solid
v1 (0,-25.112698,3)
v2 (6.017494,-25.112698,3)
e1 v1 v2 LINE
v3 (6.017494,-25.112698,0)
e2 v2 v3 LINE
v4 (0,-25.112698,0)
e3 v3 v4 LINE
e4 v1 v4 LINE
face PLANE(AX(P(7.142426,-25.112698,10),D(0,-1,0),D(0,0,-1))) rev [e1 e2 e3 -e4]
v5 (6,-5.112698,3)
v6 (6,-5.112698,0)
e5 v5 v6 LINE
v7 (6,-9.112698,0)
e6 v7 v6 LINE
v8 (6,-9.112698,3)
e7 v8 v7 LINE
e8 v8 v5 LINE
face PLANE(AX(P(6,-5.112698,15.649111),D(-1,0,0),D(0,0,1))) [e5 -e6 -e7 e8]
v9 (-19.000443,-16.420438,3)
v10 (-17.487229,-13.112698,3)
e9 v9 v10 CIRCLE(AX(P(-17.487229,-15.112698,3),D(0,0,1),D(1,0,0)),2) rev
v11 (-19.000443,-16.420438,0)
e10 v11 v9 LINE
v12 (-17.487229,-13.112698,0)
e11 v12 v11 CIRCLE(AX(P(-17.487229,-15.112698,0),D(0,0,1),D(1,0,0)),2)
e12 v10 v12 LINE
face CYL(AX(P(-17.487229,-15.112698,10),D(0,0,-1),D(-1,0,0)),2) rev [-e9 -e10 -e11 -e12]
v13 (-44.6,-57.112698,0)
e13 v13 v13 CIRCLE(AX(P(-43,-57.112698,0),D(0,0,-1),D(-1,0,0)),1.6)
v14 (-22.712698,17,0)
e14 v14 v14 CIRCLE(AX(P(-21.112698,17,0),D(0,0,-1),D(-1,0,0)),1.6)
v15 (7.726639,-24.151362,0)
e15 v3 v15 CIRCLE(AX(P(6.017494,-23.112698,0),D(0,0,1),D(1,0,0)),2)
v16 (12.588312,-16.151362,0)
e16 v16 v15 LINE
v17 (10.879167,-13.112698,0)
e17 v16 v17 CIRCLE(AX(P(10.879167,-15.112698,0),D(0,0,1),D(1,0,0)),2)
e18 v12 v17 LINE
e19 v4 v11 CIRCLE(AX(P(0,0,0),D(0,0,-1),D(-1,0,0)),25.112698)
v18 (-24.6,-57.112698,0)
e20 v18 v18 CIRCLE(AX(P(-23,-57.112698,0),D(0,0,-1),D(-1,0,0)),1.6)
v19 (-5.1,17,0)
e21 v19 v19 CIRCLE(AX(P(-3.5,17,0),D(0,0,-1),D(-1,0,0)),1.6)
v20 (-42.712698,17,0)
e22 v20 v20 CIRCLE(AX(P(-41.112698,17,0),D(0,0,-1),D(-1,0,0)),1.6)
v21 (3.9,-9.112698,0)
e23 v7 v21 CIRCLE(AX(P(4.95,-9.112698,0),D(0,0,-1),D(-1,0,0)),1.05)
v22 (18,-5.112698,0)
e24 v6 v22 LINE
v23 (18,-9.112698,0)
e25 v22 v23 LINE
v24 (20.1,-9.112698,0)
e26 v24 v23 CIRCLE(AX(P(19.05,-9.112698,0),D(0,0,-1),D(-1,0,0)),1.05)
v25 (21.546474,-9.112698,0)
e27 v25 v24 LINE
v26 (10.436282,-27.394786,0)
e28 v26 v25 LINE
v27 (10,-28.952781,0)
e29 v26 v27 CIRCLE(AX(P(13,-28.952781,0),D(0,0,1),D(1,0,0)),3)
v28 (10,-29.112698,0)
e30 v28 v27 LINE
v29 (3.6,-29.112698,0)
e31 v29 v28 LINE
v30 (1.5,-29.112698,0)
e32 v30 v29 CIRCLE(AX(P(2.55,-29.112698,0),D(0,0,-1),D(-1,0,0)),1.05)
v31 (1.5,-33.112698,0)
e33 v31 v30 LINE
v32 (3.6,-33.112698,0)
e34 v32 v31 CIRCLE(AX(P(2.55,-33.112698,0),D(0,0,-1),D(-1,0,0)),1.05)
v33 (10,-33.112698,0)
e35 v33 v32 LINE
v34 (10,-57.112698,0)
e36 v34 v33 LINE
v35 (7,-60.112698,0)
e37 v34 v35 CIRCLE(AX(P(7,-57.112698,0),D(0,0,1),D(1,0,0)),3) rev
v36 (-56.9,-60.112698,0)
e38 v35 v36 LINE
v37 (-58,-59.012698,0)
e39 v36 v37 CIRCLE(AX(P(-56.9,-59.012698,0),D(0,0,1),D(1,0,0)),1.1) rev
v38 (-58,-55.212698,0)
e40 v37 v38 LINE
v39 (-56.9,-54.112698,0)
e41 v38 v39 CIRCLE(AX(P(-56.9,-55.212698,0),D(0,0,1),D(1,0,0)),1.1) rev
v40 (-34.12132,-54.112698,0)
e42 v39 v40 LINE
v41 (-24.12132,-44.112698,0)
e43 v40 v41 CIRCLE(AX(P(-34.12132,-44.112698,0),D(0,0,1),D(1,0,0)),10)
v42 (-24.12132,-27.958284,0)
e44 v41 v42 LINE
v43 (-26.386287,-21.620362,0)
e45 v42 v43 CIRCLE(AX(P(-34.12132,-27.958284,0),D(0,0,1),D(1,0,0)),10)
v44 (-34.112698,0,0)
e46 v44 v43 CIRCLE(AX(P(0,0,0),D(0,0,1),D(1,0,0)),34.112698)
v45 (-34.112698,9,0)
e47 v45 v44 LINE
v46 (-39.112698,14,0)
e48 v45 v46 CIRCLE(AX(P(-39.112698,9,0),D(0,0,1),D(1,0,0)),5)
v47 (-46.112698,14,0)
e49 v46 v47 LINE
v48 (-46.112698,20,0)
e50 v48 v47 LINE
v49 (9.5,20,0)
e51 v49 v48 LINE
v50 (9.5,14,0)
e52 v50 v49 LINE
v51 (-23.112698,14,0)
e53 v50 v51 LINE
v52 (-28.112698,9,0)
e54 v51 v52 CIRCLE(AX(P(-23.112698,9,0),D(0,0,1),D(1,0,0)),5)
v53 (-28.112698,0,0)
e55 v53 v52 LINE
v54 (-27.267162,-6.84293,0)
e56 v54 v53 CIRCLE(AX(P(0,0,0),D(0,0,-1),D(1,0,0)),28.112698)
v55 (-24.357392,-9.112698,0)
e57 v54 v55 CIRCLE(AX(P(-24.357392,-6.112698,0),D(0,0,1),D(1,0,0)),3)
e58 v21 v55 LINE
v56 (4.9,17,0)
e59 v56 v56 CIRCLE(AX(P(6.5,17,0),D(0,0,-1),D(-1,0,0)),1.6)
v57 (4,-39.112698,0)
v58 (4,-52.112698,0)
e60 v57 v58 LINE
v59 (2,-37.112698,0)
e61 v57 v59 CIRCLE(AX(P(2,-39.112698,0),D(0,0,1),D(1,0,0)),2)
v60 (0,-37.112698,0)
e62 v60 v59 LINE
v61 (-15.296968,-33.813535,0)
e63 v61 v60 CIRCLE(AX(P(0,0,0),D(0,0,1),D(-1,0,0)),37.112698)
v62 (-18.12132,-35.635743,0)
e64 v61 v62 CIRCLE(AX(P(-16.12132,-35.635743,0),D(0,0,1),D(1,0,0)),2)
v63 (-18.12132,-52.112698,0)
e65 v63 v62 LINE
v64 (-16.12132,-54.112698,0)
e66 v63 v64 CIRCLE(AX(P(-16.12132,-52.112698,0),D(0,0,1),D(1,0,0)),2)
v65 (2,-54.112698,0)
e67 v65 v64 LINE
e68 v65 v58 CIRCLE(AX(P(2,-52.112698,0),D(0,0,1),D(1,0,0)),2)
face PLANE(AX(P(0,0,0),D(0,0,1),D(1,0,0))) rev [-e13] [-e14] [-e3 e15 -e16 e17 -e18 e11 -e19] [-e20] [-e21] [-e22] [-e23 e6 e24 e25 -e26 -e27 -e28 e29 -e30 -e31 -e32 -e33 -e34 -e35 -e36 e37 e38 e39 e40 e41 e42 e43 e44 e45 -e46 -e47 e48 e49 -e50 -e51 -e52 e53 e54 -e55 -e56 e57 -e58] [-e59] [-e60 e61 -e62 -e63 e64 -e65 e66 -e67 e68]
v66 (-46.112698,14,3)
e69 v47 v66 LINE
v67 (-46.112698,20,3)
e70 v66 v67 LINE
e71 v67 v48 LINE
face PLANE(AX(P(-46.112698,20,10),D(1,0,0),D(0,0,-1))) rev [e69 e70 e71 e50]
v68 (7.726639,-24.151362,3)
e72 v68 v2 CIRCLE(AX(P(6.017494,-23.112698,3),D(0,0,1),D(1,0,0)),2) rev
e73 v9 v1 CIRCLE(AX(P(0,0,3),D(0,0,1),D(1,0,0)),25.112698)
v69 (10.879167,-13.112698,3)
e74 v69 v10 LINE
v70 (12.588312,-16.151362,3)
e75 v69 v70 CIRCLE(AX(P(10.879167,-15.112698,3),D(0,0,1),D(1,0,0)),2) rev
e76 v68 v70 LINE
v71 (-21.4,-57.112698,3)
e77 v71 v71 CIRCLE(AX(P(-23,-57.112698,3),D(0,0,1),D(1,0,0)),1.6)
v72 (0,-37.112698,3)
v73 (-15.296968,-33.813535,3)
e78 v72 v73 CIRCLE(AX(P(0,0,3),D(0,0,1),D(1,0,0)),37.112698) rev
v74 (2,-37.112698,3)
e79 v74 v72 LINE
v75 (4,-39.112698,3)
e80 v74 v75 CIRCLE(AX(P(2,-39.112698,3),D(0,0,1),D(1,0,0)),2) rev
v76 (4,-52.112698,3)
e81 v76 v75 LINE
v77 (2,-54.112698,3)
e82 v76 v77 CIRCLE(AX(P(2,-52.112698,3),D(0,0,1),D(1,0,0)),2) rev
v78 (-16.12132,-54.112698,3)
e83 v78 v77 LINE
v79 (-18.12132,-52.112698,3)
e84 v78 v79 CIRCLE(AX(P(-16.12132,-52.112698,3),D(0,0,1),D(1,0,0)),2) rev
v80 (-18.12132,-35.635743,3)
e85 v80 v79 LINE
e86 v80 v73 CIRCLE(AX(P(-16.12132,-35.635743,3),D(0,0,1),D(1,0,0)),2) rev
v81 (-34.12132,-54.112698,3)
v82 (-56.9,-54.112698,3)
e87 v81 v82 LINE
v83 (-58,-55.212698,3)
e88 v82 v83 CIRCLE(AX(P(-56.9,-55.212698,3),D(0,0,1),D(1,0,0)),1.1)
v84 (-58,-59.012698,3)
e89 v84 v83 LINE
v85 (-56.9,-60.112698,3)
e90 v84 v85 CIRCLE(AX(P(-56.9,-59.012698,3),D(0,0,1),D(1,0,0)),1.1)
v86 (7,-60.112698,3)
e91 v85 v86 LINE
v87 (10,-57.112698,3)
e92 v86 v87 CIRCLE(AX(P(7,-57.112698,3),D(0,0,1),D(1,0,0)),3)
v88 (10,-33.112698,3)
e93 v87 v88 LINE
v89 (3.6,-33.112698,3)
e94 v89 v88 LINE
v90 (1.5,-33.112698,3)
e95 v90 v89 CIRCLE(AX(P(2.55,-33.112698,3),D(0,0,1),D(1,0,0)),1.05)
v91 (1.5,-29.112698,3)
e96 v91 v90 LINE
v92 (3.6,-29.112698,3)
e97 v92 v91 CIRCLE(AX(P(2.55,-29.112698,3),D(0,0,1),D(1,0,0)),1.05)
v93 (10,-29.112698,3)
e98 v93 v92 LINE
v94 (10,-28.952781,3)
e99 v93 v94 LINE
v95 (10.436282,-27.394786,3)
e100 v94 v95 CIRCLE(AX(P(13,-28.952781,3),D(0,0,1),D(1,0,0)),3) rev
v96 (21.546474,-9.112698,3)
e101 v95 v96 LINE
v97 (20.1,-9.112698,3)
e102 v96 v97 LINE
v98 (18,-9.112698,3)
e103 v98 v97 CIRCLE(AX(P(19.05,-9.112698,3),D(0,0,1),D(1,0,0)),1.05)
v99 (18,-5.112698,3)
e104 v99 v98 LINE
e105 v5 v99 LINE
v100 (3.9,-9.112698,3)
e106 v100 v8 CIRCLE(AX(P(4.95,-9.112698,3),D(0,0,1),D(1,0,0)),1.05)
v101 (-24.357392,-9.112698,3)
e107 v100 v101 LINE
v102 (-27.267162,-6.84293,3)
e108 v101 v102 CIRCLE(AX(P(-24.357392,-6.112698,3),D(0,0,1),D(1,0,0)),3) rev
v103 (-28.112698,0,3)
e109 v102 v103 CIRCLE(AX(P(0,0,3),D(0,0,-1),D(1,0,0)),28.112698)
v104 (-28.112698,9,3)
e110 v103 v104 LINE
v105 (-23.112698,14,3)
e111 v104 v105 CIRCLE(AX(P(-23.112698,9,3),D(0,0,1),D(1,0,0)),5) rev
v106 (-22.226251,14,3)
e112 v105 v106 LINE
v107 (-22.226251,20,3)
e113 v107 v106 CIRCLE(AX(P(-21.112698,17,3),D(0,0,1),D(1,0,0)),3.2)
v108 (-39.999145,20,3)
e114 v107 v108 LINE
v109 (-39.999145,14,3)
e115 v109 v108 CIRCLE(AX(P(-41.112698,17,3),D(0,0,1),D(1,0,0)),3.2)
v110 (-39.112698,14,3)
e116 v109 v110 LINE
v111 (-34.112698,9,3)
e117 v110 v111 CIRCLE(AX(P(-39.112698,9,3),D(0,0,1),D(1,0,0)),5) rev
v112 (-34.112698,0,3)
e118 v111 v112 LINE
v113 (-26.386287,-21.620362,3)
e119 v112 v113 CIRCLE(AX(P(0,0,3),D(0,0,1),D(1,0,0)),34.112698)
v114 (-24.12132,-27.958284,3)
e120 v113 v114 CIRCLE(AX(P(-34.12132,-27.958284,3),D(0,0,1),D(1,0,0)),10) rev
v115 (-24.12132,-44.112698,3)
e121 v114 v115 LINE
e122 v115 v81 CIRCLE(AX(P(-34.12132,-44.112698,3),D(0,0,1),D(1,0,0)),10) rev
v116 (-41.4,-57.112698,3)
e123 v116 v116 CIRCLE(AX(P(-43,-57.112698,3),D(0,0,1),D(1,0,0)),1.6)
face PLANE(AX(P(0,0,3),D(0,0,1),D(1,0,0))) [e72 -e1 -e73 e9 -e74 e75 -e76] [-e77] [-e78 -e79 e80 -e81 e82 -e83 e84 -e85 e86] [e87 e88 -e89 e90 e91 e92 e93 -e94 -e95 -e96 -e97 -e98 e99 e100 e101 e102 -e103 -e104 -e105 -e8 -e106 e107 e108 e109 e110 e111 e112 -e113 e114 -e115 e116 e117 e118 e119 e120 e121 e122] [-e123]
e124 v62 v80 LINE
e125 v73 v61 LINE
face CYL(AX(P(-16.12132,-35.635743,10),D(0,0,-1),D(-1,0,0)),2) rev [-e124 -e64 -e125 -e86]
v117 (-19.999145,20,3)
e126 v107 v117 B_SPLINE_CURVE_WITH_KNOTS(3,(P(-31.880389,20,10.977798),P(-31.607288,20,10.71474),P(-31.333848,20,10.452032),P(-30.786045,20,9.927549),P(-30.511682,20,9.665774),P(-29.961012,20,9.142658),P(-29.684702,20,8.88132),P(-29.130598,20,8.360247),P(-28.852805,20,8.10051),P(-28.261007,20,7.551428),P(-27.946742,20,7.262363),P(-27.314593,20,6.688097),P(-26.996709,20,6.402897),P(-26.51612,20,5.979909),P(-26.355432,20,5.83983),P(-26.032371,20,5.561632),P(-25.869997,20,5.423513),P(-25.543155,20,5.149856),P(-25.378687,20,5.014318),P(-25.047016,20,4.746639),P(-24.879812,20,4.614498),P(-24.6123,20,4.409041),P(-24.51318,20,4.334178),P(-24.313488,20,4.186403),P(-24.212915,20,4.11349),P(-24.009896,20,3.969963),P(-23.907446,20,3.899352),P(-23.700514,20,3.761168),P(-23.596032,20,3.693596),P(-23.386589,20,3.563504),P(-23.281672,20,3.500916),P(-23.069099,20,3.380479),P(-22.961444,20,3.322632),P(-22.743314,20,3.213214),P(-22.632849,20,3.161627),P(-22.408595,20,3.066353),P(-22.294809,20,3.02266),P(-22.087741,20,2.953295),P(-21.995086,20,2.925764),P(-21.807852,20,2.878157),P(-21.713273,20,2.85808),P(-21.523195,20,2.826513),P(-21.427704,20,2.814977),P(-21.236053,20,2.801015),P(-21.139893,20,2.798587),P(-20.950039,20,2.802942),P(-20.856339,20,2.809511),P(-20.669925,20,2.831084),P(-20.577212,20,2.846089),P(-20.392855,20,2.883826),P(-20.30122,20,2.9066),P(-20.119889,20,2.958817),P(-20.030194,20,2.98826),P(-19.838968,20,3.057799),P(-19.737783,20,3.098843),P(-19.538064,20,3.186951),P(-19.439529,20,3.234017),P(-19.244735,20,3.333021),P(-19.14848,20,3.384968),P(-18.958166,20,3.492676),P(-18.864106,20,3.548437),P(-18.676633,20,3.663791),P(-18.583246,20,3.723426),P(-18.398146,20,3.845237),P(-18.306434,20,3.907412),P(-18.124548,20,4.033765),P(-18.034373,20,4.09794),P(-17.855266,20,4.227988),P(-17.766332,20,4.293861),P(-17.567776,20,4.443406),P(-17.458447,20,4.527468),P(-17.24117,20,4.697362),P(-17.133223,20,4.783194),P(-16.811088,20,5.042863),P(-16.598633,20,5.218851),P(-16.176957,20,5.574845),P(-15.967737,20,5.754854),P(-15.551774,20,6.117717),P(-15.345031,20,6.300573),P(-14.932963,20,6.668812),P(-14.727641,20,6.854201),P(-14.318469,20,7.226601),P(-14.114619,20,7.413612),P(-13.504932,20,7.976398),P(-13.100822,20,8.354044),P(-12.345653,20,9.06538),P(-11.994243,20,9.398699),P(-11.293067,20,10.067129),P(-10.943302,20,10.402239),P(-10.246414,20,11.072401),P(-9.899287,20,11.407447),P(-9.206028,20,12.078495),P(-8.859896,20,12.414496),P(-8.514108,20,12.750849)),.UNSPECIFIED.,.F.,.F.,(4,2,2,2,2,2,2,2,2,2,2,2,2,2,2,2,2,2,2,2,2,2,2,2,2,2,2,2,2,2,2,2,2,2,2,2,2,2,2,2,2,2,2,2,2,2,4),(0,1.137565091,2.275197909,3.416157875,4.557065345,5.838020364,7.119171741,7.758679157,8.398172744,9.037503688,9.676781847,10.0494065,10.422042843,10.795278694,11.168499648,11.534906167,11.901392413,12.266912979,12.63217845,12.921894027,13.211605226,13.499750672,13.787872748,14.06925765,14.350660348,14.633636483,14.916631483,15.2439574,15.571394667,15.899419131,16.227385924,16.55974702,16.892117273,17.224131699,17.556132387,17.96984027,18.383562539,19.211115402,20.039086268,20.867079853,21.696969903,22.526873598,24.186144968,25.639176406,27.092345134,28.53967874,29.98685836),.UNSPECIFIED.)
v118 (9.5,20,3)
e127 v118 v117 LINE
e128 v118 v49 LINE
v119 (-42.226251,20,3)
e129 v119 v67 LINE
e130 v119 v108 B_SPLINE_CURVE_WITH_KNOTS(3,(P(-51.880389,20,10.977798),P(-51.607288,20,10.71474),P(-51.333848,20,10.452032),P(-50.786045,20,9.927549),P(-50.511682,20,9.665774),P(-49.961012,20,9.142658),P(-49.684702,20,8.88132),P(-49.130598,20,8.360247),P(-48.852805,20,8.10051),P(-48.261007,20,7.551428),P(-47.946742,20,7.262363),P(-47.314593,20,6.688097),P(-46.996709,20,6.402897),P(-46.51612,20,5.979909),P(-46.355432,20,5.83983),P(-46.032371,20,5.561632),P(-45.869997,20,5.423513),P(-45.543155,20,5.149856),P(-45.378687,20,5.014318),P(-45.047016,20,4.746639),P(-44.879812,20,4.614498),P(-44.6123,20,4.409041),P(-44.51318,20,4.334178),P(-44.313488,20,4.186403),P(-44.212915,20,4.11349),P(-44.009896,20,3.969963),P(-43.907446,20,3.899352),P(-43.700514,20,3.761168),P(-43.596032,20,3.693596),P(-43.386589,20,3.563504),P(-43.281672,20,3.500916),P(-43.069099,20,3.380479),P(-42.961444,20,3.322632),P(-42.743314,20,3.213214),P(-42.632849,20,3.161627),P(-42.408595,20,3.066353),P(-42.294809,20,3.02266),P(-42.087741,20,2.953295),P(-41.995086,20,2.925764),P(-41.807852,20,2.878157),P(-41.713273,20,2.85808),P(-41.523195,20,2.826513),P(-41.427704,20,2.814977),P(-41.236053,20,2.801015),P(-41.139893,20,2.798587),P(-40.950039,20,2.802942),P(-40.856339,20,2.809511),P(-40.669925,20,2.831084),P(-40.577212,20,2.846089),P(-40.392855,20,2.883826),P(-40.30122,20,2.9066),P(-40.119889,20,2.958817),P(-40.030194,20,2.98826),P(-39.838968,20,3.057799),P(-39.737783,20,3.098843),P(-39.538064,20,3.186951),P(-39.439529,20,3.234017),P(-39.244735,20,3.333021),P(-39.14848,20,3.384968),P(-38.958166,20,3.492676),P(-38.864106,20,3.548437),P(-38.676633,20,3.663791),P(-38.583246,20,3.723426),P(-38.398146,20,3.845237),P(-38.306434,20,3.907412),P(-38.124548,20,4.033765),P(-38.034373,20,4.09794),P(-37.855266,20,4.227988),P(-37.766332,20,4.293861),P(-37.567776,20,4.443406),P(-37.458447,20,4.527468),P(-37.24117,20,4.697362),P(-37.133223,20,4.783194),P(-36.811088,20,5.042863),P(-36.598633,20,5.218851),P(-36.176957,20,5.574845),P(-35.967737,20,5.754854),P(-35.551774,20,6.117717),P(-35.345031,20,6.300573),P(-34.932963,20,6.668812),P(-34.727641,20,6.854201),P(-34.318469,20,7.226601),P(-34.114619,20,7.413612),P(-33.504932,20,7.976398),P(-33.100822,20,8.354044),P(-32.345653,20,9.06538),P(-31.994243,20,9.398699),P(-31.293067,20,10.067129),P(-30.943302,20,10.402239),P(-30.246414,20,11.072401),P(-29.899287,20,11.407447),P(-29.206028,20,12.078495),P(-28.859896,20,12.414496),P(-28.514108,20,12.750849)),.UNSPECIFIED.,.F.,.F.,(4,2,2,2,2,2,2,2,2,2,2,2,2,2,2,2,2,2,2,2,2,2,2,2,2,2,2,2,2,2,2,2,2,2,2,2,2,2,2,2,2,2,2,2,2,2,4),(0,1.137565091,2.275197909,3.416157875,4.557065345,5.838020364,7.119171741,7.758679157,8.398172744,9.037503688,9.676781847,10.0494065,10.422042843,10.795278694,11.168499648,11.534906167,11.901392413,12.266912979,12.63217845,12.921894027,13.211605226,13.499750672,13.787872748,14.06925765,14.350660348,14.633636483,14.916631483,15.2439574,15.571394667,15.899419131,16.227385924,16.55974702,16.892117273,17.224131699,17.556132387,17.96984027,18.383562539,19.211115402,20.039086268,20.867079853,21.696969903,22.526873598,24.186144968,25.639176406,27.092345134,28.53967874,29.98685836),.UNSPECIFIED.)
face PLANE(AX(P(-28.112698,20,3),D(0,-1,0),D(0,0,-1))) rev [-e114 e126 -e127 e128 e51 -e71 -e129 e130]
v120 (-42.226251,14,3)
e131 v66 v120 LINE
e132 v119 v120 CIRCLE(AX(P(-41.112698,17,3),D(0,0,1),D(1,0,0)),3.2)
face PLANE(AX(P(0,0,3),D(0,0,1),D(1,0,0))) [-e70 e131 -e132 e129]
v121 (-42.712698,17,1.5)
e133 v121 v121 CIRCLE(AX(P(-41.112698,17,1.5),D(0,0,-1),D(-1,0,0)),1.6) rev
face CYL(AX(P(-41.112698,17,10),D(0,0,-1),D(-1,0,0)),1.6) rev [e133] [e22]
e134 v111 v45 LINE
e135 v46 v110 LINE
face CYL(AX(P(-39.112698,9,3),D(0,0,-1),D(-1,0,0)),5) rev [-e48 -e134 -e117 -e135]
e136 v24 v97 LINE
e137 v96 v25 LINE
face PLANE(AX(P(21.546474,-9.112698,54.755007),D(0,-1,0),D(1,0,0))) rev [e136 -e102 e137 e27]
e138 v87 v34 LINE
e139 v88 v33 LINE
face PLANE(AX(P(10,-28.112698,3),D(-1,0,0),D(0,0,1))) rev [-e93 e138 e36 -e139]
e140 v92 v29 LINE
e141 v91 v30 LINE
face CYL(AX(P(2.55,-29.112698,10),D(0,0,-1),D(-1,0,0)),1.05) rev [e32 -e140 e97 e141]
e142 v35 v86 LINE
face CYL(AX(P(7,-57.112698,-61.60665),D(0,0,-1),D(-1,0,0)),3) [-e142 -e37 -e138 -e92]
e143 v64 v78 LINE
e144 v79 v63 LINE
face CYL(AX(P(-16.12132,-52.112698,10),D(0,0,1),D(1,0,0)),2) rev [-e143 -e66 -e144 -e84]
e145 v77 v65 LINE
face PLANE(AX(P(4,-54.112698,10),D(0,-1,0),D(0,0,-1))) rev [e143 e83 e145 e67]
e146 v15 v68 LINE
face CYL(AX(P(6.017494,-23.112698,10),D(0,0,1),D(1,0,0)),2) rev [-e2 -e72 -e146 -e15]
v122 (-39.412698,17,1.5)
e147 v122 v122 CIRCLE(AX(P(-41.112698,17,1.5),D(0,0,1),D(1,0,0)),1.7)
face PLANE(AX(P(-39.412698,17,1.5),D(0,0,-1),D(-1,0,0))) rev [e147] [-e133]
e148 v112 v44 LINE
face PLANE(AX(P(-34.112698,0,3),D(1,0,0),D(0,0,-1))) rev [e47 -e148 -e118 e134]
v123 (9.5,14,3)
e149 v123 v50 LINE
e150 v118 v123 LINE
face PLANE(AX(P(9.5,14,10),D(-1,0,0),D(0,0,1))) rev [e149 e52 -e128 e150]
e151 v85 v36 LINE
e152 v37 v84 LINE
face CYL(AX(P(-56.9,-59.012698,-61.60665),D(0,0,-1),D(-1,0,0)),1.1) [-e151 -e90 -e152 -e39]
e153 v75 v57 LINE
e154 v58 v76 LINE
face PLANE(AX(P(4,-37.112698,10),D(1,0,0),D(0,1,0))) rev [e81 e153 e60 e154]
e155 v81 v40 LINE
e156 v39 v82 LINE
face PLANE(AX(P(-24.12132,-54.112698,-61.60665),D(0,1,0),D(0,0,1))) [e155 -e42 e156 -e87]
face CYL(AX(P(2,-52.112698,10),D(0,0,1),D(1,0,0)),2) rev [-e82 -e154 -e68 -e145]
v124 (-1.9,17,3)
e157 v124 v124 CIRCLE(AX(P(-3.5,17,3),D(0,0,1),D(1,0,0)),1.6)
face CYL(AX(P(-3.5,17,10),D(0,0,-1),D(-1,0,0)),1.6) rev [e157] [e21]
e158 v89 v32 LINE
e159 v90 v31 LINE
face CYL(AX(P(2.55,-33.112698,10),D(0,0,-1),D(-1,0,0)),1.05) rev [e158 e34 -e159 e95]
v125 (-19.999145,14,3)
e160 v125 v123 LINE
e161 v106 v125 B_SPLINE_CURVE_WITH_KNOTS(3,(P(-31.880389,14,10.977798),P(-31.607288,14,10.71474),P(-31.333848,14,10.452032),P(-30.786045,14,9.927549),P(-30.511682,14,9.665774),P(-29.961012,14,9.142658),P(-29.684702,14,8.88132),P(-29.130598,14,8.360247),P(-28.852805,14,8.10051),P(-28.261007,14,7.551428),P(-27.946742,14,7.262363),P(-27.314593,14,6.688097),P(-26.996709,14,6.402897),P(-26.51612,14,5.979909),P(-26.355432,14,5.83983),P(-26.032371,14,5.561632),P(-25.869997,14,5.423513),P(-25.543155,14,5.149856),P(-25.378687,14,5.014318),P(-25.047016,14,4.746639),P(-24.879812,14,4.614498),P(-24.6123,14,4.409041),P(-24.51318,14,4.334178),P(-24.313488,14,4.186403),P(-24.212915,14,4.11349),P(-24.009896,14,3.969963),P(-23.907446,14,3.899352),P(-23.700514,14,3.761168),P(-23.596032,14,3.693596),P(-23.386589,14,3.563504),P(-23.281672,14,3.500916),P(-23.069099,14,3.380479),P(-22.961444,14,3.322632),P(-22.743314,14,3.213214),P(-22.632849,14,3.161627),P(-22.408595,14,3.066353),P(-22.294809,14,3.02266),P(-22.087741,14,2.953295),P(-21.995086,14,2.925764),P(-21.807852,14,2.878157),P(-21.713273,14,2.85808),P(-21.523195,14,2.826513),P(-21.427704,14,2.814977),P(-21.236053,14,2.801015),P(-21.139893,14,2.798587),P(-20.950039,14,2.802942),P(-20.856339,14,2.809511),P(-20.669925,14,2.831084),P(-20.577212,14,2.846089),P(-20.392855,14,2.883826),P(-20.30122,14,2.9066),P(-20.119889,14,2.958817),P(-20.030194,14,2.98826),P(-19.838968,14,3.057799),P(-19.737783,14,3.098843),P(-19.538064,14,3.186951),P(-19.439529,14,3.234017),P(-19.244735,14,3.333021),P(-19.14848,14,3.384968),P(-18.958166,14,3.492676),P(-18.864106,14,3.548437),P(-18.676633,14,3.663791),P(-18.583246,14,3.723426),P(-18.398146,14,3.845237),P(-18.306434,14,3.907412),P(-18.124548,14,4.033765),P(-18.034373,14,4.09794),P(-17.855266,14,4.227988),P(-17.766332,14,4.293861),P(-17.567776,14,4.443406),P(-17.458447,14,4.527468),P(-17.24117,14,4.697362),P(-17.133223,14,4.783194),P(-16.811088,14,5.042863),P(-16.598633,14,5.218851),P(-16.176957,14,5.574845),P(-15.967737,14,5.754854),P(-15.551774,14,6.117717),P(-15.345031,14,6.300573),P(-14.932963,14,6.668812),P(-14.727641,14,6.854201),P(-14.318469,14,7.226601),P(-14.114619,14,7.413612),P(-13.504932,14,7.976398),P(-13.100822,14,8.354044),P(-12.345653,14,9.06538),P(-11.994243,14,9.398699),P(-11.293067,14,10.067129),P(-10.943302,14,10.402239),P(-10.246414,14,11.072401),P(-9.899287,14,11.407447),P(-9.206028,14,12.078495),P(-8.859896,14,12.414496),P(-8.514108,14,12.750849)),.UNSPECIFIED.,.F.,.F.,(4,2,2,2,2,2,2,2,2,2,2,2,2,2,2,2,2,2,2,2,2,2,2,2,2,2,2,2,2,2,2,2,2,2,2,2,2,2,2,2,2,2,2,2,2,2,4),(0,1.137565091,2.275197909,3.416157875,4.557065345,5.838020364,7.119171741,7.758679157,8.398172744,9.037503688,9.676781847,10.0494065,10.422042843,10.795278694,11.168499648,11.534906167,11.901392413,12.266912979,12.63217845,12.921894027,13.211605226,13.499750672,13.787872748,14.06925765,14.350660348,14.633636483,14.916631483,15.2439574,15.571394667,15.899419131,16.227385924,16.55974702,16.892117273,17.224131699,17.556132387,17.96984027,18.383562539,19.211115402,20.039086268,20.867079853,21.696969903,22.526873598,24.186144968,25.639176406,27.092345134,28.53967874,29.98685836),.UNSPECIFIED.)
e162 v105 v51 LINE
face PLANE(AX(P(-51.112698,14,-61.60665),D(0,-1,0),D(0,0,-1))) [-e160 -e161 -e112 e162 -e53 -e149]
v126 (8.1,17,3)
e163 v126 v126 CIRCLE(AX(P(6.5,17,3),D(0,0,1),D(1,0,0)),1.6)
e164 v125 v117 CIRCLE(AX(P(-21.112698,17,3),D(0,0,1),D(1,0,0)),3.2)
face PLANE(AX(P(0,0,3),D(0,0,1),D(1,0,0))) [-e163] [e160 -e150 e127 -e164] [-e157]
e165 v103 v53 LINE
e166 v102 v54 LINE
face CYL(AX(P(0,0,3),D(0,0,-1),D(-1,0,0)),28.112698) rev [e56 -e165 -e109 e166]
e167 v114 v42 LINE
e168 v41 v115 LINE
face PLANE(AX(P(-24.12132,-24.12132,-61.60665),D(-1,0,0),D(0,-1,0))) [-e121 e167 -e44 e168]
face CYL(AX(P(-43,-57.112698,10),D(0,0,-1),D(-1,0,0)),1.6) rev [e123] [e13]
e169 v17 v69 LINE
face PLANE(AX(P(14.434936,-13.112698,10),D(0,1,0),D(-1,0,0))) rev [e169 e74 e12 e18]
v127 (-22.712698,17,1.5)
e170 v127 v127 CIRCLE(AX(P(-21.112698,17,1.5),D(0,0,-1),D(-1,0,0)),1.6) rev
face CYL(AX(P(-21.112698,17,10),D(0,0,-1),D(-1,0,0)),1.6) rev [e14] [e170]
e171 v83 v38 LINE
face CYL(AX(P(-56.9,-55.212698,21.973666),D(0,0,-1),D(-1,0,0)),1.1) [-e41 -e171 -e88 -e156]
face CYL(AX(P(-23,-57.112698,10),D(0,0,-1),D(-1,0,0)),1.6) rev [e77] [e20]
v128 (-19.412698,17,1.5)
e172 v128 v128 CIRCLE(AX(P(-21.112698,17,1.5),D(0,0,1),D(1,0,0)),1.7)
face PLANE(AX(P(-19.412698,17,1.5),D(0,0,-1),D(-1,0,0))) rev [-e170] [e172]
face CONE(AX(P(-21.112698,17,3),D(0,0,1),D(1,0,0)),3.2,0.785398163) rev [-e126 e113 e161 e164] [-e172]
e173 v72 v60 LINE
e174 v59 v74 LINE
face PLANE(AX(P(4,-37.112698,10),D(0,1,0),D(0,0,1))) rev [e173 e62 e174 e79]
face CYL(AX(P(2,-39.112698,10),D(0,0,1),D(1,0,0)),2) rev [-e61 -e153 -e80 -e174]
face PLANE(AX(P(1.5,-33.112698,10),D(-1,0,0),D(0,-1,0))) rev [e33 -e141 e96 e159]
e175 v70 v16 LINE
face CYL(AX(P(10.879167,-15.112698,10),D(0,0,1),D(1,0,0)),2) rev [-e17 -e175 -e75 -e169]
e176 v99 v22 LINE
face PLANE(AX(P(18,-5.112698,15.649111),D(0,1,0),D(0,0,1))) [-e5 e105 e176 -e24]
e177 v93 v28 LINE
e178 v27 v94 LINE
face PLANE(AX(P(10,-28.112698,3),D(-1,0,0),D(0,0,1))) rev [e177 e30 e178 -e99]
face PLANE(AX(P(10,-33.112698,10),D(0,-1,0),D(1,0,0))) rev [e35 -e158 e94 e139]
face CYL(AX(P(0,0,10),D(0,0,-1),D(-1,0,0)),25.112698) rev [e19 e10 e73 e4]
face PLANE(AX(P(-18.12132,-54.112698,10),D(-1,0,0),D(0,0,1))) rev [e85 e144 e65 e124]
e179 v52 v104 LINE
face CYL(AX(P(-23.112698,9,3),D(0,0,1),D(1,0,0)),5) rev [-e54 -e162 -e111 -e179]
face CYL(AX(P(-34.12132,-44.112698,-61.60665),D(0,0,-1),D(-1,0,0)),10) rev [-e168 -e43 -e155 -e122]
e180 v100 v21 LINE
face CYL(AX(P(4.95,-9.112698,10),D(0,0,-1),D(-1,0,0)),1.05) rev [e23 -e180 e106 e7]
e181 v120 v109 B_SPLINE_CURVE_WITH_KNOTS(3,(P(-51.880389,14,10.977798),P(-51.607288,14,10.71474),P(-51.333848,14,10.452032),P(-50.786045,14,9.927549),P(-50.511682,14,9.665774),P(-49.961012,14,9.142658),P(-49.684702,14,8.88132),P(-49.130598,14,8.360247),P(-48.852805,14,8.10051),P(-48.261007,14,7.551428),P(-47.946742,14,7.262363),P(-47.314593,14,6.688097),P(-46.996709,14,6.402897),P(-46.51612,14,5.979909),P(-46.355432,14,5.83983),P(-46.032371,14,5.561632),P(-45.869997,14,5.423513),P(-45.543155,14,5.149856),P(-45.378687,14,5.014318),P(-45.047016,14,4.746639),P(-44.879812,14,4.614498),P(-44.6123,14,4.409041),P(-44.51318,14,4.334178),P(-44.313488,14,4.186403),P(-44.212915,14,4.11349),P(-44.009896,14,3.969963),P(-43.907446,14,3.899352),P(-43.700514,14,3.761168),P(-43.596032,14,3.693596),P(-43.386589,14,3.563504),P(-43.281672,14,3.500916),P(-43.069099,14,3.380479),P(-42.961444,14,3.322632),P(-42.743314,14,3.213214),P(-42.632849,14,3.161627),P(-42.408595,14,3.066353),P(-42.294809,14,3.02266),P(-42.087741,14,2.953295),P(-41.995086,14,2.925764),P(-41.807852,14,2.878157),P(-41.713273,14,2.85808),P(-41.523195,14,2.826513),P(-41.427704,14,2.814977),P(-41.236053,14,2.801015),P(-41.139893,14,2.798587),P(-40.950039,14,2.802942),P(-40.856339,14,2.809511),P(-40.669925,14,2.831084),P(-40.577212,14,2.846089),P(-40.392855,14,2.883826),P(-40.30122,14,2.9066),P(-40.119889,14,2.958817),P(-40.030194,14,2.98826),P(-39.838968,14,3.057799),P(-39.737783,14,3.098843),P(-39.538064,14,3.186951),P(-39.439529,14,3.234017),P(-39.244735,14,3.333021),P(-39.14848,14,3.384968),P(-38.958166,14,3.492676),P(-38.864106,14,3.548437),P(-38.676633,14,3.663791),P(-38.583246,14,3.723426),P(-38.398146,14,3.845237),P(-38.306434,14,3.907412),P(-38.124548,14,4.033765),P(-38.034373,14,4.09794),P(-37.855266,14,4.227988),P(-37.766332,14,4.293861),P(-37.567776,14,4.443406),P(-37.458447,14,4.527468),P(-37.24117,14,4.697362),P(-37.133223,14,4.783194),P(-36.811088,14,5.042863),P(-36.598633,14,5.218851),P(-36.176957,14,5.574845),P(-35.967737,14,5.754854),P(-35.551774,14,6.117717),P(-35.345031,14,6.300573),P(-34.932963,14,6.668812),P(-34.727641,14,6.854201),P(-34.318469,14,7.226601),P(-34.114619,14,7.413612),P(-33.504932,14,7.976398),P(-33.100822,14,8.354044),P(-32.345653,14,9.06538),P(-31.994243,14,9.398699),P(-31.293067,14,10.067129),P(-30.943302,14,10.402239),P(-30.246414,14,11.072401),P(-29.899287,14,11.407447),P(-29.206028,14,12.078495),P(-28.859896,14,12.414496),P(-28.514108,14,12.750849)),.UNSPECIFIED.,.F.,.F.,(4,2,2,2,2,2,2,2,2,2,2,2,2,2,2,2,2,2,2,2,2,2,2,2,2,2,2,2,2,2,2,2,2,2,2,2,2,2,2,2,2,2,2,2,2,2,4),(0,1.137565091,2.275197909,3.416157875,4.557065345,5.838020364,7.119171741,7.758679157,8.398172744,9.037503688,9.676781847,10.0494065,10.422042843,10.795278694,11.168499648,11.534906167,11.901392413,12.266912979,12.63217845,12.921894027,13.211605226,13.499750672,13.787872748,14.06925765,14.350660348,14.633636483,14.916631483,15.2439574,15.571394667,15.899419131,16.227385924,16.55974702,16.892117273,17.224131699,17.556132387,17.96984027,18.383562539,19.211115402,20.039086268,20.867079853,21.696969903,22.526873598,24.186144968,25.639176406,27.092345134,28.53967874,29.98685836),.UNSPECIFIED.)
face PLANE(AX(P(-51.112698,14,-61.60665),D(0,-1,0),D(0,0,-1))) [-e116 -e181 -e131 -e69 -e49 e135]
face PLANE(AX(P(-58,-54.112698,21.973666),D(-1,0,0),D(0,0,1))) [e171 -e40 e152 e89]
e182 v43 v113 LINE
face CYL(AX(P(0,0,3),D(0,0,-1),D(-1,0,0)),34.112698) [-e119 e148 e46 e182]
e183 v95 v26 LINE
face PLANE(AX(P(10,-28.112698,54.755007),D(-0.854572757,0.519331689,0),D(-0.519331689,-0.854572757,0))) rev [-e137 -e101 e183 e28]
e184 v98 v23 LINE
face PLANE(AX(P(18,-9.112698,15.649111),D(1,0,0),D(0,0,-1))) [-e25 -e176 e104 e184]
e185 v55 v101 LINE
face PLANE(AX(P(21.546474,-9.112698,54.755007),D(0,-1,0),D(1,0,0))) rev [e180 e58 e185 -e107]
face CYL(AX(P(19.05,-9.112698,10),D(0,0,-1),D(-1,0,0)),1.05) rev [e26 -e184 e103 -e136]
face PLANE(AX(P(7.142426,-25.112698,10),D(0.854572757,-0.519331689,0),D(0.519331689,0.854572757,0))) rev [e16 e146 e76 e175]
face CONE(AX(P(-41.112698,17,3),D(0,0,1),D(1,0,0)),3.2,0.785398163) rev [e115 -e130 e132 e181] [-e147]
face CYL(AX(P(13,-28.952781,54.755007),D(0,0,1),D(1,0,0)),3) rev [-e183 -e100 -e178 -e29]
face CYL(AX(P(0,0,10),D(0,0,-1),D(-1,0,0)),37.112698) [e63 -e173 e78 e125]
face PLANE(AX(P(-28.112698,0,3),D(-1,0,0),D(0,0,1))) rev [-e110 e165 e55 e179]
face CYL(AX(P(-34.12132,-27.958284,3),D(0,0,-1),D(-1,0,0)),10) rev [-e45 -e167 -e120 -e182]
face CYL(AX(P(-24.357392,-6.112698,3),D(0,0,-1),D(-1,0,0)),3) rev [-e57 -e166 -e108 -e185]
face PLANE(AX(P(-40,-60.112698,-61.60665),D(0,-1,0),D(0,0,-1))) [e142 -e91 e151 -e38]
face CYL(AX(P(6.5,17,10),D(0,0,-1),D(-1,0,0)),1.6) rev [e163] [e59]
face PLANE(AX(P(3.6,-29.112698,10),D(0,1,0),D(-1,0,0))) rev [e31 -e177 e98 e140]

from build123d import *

# Parameters (mm, degrees)
EXTRUDE_1_DEPTH       = 3
EXTRUDE_START         = -3
SKETCH_2_W            = 40
SKETCH_2_H            = 6
EXTRUDE_2_DEPTH       = 3
EXTRUDE_3_DEPTH       = 3
EXTRUDE_4_DEPTH       = 3
CUT_EXTRUDE_1_DEPTH   = 10
SKETCH_7_W            = 12
SKETCH_7_H            = 4
EXTRUDE_5_DEPTH       = 3
SKETCH_8_R            = 1.05
CUT_EXTRUDE_2_DEPTH   = 10
SKETCH_9_W            = 26
SKETCH_9_H            = 6
EXTRUDE_6_DEPTH       = 3
SKETCH_10_R           = 1.6
CUT_EXTRUDE_3_DEPTH   = 10
SKETCH_14_W           = 18
SKETCH_14_H           = 6
EXTRUDE_7_DEPTH       = 3
SKETCH_15_R           = 1.6
CUT_EXTRUDE_4_DEPTH   = 10
FILLET_2_R            = 3
FILLET_3_R            = 3
FILLET_4_R            = 3
FILLET_5_R            = 10
FILLET_6_R            = 1.1
CUT_EXTRUDE_7_DEPTH   = 10
FILLET_8_R            = 2
SKETCH_17_W           = 5.387301628
SKETCH_17_H           = 6
CUT_EXTRUDE_8_DEPTH   = 10
SKETCH_18_W           = 31
SKETCH_18_H           = 6
EXTRUDE_8_DEPTH       = 3
SKETCH_19_R           = 1.6
CUT_EXTRUDE_9_DEPTH   = 10
OTHER_1_OUTLINE_R     = 1.7
OTHER_1_OUTLINE_R_2   = 1.6
OTHER_1_DEPTH         = 1.5
OTHER_1_DRAFT         = -45
OTHER_1_2_OUTLINE_R   = 1.7
OTHER_1_2_OUTLINE_R_2 = 1.6
OTHER_1_2_DEPTH       = 1.5
OTHER_1_2_DRAFT       = -45
SKETCH_23_W           = 5
SKETCH_23_H           = 6
CUT_EXTRUDE_10_DEPTH  = 10
FILLET_9_R            = 5


# Read off the part's stored shape, not the designer's step: 高级异型孔1
with BuildPart() as part:
    # 草图1 → 凸台-拉伸1 (new body)
    with BuildSketch(Plane.XY):
        with BuildLine():
            Line((0, -28.112698372), (10, -28.112698372))
            Line((10, -28.112698372), (10, -34.112698372))
            Line((10, -34.112698372), (0, -34.112698372))
            ThreePointArc((0, -34.112698372), (-24.121320344, -24.121320344), (-34.112698372, 0))
            Line((-34.112698372, 0), (-34.112698372, 20))
            Line((-34.112698372, 20), (-28.112698372, 20))
            Line((-28.112698372, 20), (-28.112698372, 0))
            ThreePointArc((-28.112698372, 0), (-19.878679656, -19.878679656), (0, -28.112698372))
        make_face()
    extrude(amount=EXTRUDE_1_DEPTH)

    # 草图2 → 凸台-拉伸2 (add)
    with BuildSketch(Plane.XY.offset(3).offset(EXTRUDE_START)):
        with BuildLine():
            Line((-24.121320344, -24.121320344), (-24.121320344, -54.112698372))
            Line((-24.121320344, -54.112698372), (-40, -54.112698372))
            Line((-40, -54.112698372), (-40, -60.112698372))
            Line((-40, -60.112698372), (10, -60.112698372))
            Line((10, -60.112698372), (10, -54.112698372))
            Line((10, -54.112698372), (-18.121320344, -54.112698372))
            Line((-18.121320344, -54.112698372), (-18.121320344, -28.901452199))
            ThreePointArc((-18.121320344, -28.901452199), (-21.256118841, -26.680584739), (-24.121320344, -24.121320344))
        make_face()
        with Locations((-31.112698372, 17)):
            Rectangle(SKETCH_2_W, SKETCH_2_H)
    extrude(amount=EXTRUDE_2_DEPTH)

    # 草图4 → 凸台-拉伸3 (add)
    with BuildSketch(Plane(origin=(0, 0, 0), x_dir=(-1, 0, 0), z_dir=(0, 0, -1))):
        with BuildLine():
            Line((-10, -28.112698372), (-21.546473969, -9.112698372))
            Line((-21.546473969, -9.112698372), (26.59478404, -9.112698372))
            ThreePointArc((26.59478404, -9.112698372), (16.342295877, -22.874727872), (0, -28.112698372))
            Line((0, -28.112698372), (-10, -28.112698372))
        make_face()
    extrude(amount=-EXTRUDE_3_DEPTH)

    # 草图6 → 凸台-拉伸4 (add)
    with BuildSketch(Plane.XY.offset(3).offset(EXTRUDE_START)):
        with BuildLine():
            Line((10, -34.112698372), (10, -54.112698372))
            Line((10, -54.112698372), (-18.121320344, -54.112698372))
            Line((-18.121320344, -54.112698372), (-18.121320344, -28.901452199))
            ThreePointArc((-18.121320344, -28.901452199), (-9.427875393, -32.784010673), (0, -34.112698372))
            Line((0, -34.112698372), (10, -34.112698372))
        make_face()
    extrude(amount=EXTRUDE_4_DEPTH)

    # 草图3 → 切除-拉伸1 (cut)
    with BuildSketch(Plane(origin=(0, 0, 0), x_dir=(-1, 0, 0), z_dir=(0, 0, -1))):
        with BuildLine():
            Line((-3.6, -29.112698372), (-10, -29.112698372))
            Line((-10, -29.112698372), (-10, -33.112698372))
            Line((-10, -33.112698372), (-3.6, -33.112698372))
            ThreePointArc((-3.6, -33.112698372), (-2.55, -34.162698372), (-1.5, -33.112698372))
            Line((-1.5, -33.112698372), (-1.5, -29.112698372))
            ThreePointArc((-1.5, -29.112698372), (-2.55, -28.062698372), (-3.6, -29.112698372))
        make_face()
    extrude(amount=-CUT_EXTRUDE_1_DEPTH, mode=Mode.SUBTRACT)

    # 草图7 → 凸台-拉伸5 (add)
    with BuildSketch(Plane(origin=(0, 0, 0), x_dir=(-1, 0, 0), z_dir=(0, 0, -1))):
        with Locations((-12, -7.112698372)):
            Rectangle(SKETCH_7_W, SKETCH_7_H)
    extrude(amount=-EXTRUDE_5_DEPTH)

    # 草图8 → 切除-拉伸2 (cut)
    with BuildSketch(Plane(origin=(0, 0, 0), x_dir=(-1, 0, 0), z_dir=(0, 0, -1))):
        with Locations((-4.95, -9.112698372)):
            Circle(SKETCH_8_R)
        with Locations((-19.05, -9.112698372)):
            Circle(SKETCH_8_R)
    extrude(amount=-CUT_EXTRUDE_2_DEPTH, mode=Mode.SUBTRACT)

    # 草图9 → 凸台-拉伸6 (add)
    with BuildSketch(Plane(origin=(0, 0, 0), x_dir=(-1, 0, 0), z_dir=(0, 0, -1))):
        with Locations((-1.887301628, 17)):
            Rectangle(SKETCH_9_W, SKETCH_9_H)
    extrude(amount=-EXTRUDE_6_DEPTH)

    # 草图10 → 切除-拉伸3 (cut)
    with BuildSketch(Plane(origin=(0, 0, 0), x_dir=(-1, 0, 0), z_dir=(0, 0, -1))):
        with Locations((41.112698372, 17)):
            Circle(SKETCH_10_R)
        with Locations((21.112698372, 17)):
            Circle(SKETCH_10_R)
        with Locations((3.5, 17)):
            Circle(SKETCH_10_R)
        with Locations((-6.5, 17)):
            Circle(SKETCH_10_R)
    extrude(amount=-CUT_EXTRUDE_3_DEPTH, mode=Mode.SUBTRACT)

    # 草图14 → 凸台-拉伸7 (add)
    with BuildSketch(Plane(origin=(0, 0, 0), x_dir=(-1, 0, 0), z_dir=(0, 0, -1))):
        with Locations((49, -57.112698372)):
            Rectangle(SKETCH_14_W, SKETCH_14_H)
    extrude(amount=-EXTRUDE_7_DEPTH)

    # 草图15 → 切除-拉伸4 (cut)
    with BuildSketch(Plane(origin=(0, 0, 0), x_dir=(-1, 0, 0), z_dir=(0, 0, -1))):
        with Locations((43, -57.112698372)):
            Circle(SKETCH_15_R)
        with Locations((23, -57.112698372)):
            Circle(SKETCH_15_R)
    extrude(amount=-CUT_EXTRUDE_4_DEPTH, mode=Mode.SUBTRACT)

    # 圆角2
    fillet_2_edges = [part.edges().sort_by_distance(p)[0] for p in [
        (-26.59478404, -9.112698372, 1.5),
    ]]
    fillet(fillet_2_edges, radius=FILLET_2_R)

    # 圆角3
    fillet_3_edges = [part.edges().sort_by_distance(p)[0] for p in [
        (10, -28.112698372, 1.5),
    ]]
    fillet(fillet_3_edges, radius=FILLET_3_R)

    # 圆角4
    fillet_4_edges = [part.edges().sort_by_distance(p)[0] for p in [
        (10, -60.112698372, 1.5),
    ]]
    fillet(fillet_4_edges, radius=FILLET_4_R)

    # 圆角5
    fillet_5_edges = [part.edges().sort_by_distance(p)[0] for p in [
        (-24.121320344, -24.121320344, 1.5),
        (-24.121320344, -54.112698372, 1.5),
    ]]
    fillet(fillet_5_edges, radius=FILLET_5_R)

    # 圆角6
    fillet_6_edges = [part.edges().sort_by_distance(p)[0] for p in [
        (-58, -60.112698372, 1.5),
        (-58, -54.112698372, 1.5),
    ]]
    fillet(fillet_6_edges, radius=FILLET_6_R)

    # 草图16 → 切除-拉伸7 (cut)
    with BuildSketch(Plane(origin=(0, 0, 0), x_dir=(-1, 0, 0), z_dir=(0, 0, -1))):
        with BuildLine():
            Line((-4, -37.112698372), (0, -37.112698372))
            ThreePointArc((0, -37.112698372), (9.363584206, -35.912054679), (18.121320344, -32.387808346))
            Line((18.121320344, -32.387808346), (18.121320344, -54.112698372))
            Line((18.121320344, -54.112698372), (-4, -54.112698372))
            Line((-4, -54.112698372), (-4, -37.112698372))
        make_face()
        with BuildLine():
            Line((-7.142425951, -25.112698372), (0, -25.112698372))
            ThreePointArc((0, -25.112698372), (12.275023024, -21.908250256), (21.417393888, -13.112698372))
            Line((21.417393888, -13.112698372), (-14.434935826, -13.112698372))
            Line((-14.434935826, -13.112698372), (-7.142425951, -25.112698372))
        make_face()
    extrude(amount=-CUT_EXTRUDE_7_DEPTH, mode=Mode.SUBTRACT)

    # 圆角8
    fillet_8_edges = [part.edges().sort_by_distance(p)[0] for p in [
        (4, -54.112698372, 1.5),
        (4, -37.112698372, 1.5),
        (-18.121320344, -32.387808346, 1.5),
        (-18.121320344, -54.112698372, 1.5),
        (-21.417393888, -13.112698372, 1.5),
        (7.142425951, -25.112698372, 1.5),
        (14.434935826, -13.112698372, 1.5),
    ]]
    fillet(fillet_8_edges, radius=FILLET_8_R)

    # 草图17 → 切除-拉伸8 (cut)
    with BuildSketch(Plane(origin=(0, 0, 0), x_dir=(-1, 0, 0), z_dir=(0, 0, -1))):
        with Locations((-12.193650814, 17)):
            Rectangle(SKETCH_17_W, SKETCH_17_H)
    extrude(amount=-CUT_EXTRUDE_8_DEPTH, mode=Mode.SUBTRACT)

    # 草图18 → 凸台-拉伸8 (add)
    with BuildSketch(Plane(origin=(0, 0, 0), x_dir=(-1, 0, 0), z_dir=(0, 0, -1))):
        with Locations((31.612698372, 17)):
            Rectangle(SKETCH_18_W, SKETCH_18_H)
    extrude(amount=-EXTRUDE_8_DEPTH)

    # 草图19 → 切除-拉伸9 (cut)
    with BuildSketch(Plane(origin=(0, 0, 0), x_dir=(-1, 0, 0), z_dir=(0, 0, -1))):
        with Locations((21.112698372, 17)):
            Circle(SKETCH_19_R)
        with Locations((41.112698372, 17)):
            Circle(SKETCH_19_R)
    extrude(amount=-CUT_EXTRUDE_9_DEPTH, mode=Mode.SUBTRACT)


with BuildPart() as other_1_tool:
    # 高级异型孔1 outline → 高级异型孔1 (with draft: the straight prism first)
    with BuildSketch(Plane.XY.offset(1.5)):
        with Locations((-21.112698372, 17)):
            Circle(OTHER_1_OUTLINE_R)
        with Locations((-21.112698372, 17)):
            Circle(OTHER_1_OUTLINE_R_2, mode=Mode.SUBTRACT)
    extrude(amount=OTHER_1_DEPTH)
    # 高级异型孔1: the draft: its side faces are tilted about the plane it starts from
    other_1_sides = [other_1_tool.faces().sort_by_distance(p)[0] for p in [
        (-22.812698372, 17, 2.25),
        (-22.712698372, 17, 2.25),
    ]]
    draft(other_1_sides, Plane.XY.offset(1.5), OTHER_1_DRAFT)


with BuildPart() as part_1:
    add(part.part)

    # 高级异型孔1: cut by other_1_tool
    add(other_1_tool.part, mode=Mode.SUBTRACT)


with BuildPart() as other_1_2_tool:
    # Other 1 2 outline → Other 1 2 (with draft: the straight prism first)
    with BuildSketch(Plane.XY.offset(1.5)):
        with Locations((-41.112698372, 17)):
            Circle(OTHER_1_2_OUTLINE_R)
        with Locations((-41.112698372, 17)):
            Circle(OTHER_1_2_OUTLINE_R_2, mode=Mode.SUBTRACT)
    extrude(amount=OTHER_1_2_DEPTH)
    # Other 1 2: the draft: its side faces are tilted about the plane it starts from
    other_1_2_sides = [other_1_2_tool.faces().sort_by_distance(p)[0] for p in [
        (-42.812698372, 17, 2.25),
        (-42.712698372, 17, 2.25),
    ]]
    draft(other_1_2_sides, Plane.XY.offset(1.5), OTHER_1_2_DRAFT)


with BuildPart() as part_2:
    add(part_1.part)

    # Other 1 2: cut by other_1_2_tool
    add(other_1_2_tool.part, mode=Mode.SUBTRACT)

    # 草图23 → 切除-拉伸10 (cut)
    with BuildSketch(Plane(origin=(0, 0, 0), x_dir=(-1, 0, 0), z_dir=(0, 0, -1))):
        with Locations((48.612698372, 17)):
            Rectangle(SKETCH_23_W, SKETCH_23_H)
    extrude(amount=-CUT_EXTRUDE_10_DEPTH, mode=Mode.SUBTRACT)

    # 圆角9
    fillet_9_edges = [part_2.edges().sort_by_distance(p)[0] for p in [
        (-28.112698372, 14, 1.5),
        (-34.112698372, 14, 1.5),
    ]]
    fillet(fillet_9_edges, radius=FILLET_9_R)


solid = part_2.part
